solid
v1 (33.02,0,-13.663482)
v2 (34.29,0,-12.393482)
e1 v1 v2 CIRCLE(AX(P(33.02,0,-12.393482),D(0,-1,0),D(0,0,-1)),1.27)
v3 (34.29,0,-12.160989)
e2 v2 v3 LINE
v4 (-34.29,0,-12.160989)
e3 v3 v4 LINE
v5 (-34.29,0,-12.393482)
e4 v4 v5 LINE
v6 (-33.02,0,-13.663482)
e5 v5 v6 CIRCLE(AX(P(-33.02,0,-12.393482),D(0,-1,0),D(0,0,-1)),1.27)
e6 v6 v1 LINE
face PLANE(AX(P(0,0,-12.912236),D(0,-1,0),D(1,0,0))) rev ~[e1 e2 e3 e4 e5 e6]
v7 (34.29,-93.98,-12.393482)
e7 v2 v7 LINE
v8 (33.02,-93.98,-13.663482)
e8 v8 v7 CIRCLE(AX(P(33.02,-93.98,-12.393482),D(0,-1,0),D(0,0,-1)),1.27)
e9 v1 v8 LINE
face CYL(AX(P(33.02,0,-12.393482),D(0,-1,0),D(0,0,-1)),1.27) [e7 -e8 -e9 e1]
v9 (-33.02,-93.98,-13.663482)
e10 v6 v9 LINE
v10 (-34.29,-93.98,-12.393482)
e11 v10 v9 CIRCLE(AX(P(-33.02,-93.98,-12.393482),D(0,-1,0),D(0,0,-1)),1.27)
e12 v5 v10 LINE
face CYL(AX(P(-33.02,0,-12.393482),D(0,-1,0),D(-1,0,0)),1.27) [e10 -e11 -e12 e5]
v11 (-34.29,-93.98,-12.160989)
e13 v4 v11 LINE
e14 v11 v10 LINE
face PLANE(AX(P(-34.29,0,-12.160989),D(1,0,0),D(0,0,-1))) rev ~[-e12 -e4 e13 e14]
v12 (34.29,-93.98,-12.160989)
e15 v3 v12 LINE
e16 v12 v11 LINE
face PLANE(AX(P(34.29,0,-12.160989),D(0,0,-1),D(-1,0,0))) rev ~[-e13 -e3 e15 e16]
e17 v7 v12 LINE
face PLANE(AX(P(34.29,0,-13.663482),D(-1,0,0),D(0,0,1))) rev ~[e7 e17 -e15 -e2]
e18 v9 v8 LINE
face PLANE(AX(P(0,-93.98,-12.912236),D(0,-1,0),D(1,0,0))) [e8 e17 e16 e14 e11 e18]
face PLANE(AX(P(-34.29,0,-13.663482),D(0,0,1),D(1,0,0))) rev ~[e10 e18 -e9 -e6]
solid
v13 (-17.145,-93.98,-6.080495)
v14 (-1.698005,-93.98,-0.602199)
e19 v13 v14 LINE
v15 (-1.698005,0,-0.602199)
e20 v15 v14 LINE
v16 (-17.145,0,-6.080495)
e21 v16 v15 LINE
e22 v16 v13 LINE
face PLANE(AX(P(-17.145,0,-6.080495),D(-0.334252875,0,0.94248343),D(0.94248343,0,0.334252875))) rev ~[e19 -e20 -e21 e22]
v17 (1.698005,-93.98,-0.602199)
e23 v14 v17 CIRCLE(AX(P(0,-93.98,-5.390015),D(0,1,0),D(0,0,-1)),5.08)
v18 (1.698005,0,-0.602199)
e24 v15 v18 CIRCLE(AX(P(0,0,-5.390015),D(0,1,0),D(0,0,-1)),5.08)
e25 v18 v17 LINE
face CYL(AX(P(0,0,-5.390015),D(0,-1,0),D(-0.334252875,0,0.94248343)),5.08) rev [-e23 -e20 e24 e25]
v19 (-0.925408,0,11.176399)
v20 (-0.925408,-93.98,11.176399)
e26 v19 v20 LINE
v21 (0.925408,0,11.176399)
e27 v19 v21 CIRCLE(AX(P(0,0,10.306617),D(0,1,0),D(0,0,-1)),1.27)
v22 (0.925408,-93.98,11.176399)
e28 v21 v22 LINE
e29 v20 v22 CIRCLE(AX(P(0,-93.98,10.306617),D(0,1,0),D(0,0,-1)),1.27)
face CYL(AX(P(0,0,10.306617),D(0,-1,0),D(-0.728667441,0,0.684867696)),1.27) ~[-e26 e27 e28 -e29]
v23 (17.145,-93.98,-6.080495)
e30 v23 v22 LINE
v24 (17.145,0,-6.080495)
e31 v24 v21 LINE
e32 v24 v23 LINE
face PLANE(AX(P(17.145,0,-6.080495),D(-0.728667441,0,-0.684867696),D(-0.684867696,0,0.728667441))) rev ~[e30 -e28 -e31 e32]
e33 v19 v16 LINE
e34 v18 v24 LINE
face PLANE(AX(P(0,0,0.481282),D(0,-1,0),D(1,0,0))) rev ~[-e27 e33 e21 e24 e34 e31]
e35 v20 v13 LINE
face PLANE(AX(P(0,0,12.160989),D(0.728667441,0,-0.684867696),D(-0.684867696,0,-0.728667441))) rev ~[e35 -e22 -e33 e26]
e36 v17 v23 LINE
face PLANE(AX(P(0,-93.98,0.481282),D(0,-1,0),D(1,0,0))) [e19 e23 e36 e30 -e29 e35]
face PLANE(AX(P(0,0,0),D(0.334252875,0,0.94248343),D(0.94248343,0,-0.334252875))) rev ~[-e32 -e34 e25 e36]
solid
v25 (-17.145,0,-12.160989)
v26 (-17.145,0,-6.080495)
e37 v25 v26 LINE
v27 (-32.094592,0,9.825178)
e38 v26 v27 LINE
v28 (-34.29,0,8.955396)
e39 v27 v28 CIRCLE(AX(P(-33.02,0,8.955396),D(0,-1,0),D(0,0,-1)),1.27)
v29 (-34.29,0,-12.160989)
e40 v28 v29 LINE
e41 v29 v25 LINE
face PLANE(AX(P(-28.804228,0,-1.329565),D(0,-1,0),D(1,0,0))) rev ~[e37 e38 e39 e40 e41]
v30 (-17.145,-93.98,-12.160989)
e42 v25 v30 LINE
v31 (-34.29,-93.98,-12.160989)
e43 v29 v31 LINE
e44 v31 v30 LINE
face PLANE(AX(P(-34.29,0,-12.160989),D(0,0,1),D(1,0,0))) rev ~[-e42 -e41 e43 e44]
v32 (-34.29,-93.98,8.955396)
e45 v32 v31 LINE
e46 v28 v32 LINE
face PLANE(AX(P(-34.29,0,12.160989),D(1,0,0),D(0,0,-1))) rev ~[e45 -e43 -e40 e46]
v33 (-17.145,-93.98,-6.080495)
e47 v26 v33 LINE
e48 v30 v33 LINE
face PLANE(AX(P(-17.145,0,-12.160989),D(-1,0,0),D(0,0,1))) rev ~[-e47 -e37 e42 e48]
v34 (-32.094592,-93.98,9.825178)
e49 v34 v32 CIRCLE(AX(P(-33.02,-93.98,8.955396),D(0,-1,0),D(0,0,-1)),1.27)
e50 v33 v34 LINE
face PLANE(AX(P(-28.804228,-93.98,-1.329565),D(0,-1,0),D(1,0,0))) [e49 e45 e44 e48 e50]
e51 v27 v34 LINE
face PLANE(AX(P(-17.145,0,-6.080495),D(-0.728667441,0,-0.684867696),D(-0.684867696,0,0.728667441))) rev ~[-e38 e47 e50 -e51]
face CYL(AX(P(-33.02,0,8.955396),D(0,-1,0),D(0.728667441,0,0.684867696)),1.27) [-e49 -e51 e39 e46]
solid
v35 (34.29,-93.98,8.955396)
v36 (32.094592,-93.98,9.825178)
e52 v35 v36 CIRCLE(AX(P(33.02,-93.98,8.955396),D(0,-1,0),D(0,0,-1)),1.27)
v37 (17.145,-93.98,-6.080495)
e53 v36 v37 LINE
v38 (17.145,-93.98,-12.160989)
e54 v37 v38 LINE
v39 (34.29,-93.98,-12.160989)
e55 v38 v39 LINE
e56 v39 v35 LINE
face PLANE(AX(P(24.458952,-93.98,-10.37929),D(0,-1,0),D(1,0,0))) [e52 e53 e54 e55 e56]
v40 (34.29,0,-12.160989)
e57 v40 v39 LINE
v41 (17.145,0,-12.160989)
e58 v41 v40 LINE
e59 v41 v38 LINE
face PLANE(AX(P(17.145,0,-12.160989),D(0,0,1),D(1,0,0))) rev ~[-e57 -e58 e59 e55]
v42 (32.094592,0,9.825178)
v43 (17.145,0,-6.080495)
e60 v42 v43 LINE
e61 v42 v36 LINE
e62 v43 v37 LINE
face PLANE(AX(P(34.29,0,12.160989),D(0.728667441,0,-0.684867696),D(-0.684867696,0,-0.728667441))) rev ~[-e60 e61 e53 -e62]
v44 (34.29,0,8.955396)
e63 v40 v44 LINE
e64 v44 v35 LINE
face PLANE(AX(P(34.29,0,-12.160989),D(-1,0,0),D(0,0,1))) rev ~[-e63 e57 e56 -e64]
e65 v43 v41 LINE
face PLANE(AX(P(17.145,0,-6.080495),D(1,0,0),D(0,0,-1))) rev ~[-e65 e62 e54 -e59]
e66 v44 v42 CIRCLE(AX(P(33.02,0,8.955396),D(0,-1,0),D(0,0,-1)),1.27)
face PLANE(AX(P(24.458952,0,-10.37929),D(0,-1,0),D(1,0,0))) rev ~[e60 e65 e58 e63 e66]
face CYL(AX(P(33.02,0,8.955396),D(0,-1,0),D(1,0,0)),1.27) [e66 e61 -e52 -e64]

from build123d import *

# Parameters (mm, degrees)
F1_DEPTH = 93.98
F3_DEPTH = 93.98
F4_R     = 5.08
F5_R     = 1.27
F6_R     = 1.27
F6_2_R   = 1.27
F6_3_R   = 1.27


# Not quite as in the source:
# - the program builds the solid bodies; features that only make, move or delete a surface that nothing else refers to are left out


with BuildPart() as f1:
    # F0 (on Front) → F1 (new body)
    with BuildSketch(Plane.XZ):
        Polygon((-17.145, -6.0804947455), (-34.29, 12.160989491), (-34.29, -12.160989491), align=None)
        Polygon((-17.145, -6.0804947455), (-34.29, -12.160989491), (-17.145, -12.160989491), align=None)
    extrude(amount=F1_DEPTH)

    # F5
    f5_edges = [f1.edges().sort_by_distance(p)[0] for p in [
        (-34.29, -46.99, 12.160989),
    ]]
    fillet(f5_edges, radius=F5_R)


with BuildPart() as f1b:
    # F0 (on Front) → F1, piece 2 (new body)
    with BuildSketch(Plane.XZ):
        Polygon((34.29, -12.160989491), (17.145, -6.0804947455), (17.145, -12.160989491), align=None)
        Polygon((34.29, -12.160989491), (34.29, 12.160989491), (17.145, -6.0804947455), align=None)
    extrude(amount=F1_DEPTH)

    # F6
    f6_edges = [f1b.edges().sort_by_distance(p)[0] for p in [
        (34.29, -46.99, 12.160989),
    ]]
    fillet(f6_edges, radius=F6_R)


with BuildPart() as f1c:
    # F0 (on Front) → F1, piece 3 (new body)
    with BuildSketch(Plane.XZ):
        Polygon((17.145, -6.0804947455), (0, 12.160989491), (-17.145, -6.0804947455), (0, 0), align=None)
    extrude(amount=F1_DEPTH)

    # F4
    f4_edges = [f1c.edges().sort_by_distance(p)[0] for p in [
        (0, -46.99, 0),
    ]]
    fillet(f4_edges, radius=F4_R)

    # F6#2
    f6_2_edges = [f1c.edges().sort_by_distance(p)[0] for p in [
        (0, -46.99, 12.160989),
    ]]
    fillet(f6_2_edges, radius=F6_2_R)


with BuildPart() as f3:
    # F0 (on Front) → F3 (new body)
    with BuildSketch(Plane.XZ):
        Polygon((-17.145, -12.160989491), (-34.29, -12.160989491), (-34.29, -13.663481921), (34.29, -13.663481921), (34.29, -12.160989491), (17.145, -12.160989491), align=None)
    extrude(amount=F3_DEPTH)

    # F6#3
    f6_3_edges = [f3.edges().sort_by_distance(p)[0] for p in [
        (-34.29, -46.99, -13.663482),
        (34.29, -46.99, -13.663482),
    ]]
    fillet(f6_3_edges, radius=F6_3_R)


solid = Compound([f1.part, f1b.part, f1c.part, f3.part])
